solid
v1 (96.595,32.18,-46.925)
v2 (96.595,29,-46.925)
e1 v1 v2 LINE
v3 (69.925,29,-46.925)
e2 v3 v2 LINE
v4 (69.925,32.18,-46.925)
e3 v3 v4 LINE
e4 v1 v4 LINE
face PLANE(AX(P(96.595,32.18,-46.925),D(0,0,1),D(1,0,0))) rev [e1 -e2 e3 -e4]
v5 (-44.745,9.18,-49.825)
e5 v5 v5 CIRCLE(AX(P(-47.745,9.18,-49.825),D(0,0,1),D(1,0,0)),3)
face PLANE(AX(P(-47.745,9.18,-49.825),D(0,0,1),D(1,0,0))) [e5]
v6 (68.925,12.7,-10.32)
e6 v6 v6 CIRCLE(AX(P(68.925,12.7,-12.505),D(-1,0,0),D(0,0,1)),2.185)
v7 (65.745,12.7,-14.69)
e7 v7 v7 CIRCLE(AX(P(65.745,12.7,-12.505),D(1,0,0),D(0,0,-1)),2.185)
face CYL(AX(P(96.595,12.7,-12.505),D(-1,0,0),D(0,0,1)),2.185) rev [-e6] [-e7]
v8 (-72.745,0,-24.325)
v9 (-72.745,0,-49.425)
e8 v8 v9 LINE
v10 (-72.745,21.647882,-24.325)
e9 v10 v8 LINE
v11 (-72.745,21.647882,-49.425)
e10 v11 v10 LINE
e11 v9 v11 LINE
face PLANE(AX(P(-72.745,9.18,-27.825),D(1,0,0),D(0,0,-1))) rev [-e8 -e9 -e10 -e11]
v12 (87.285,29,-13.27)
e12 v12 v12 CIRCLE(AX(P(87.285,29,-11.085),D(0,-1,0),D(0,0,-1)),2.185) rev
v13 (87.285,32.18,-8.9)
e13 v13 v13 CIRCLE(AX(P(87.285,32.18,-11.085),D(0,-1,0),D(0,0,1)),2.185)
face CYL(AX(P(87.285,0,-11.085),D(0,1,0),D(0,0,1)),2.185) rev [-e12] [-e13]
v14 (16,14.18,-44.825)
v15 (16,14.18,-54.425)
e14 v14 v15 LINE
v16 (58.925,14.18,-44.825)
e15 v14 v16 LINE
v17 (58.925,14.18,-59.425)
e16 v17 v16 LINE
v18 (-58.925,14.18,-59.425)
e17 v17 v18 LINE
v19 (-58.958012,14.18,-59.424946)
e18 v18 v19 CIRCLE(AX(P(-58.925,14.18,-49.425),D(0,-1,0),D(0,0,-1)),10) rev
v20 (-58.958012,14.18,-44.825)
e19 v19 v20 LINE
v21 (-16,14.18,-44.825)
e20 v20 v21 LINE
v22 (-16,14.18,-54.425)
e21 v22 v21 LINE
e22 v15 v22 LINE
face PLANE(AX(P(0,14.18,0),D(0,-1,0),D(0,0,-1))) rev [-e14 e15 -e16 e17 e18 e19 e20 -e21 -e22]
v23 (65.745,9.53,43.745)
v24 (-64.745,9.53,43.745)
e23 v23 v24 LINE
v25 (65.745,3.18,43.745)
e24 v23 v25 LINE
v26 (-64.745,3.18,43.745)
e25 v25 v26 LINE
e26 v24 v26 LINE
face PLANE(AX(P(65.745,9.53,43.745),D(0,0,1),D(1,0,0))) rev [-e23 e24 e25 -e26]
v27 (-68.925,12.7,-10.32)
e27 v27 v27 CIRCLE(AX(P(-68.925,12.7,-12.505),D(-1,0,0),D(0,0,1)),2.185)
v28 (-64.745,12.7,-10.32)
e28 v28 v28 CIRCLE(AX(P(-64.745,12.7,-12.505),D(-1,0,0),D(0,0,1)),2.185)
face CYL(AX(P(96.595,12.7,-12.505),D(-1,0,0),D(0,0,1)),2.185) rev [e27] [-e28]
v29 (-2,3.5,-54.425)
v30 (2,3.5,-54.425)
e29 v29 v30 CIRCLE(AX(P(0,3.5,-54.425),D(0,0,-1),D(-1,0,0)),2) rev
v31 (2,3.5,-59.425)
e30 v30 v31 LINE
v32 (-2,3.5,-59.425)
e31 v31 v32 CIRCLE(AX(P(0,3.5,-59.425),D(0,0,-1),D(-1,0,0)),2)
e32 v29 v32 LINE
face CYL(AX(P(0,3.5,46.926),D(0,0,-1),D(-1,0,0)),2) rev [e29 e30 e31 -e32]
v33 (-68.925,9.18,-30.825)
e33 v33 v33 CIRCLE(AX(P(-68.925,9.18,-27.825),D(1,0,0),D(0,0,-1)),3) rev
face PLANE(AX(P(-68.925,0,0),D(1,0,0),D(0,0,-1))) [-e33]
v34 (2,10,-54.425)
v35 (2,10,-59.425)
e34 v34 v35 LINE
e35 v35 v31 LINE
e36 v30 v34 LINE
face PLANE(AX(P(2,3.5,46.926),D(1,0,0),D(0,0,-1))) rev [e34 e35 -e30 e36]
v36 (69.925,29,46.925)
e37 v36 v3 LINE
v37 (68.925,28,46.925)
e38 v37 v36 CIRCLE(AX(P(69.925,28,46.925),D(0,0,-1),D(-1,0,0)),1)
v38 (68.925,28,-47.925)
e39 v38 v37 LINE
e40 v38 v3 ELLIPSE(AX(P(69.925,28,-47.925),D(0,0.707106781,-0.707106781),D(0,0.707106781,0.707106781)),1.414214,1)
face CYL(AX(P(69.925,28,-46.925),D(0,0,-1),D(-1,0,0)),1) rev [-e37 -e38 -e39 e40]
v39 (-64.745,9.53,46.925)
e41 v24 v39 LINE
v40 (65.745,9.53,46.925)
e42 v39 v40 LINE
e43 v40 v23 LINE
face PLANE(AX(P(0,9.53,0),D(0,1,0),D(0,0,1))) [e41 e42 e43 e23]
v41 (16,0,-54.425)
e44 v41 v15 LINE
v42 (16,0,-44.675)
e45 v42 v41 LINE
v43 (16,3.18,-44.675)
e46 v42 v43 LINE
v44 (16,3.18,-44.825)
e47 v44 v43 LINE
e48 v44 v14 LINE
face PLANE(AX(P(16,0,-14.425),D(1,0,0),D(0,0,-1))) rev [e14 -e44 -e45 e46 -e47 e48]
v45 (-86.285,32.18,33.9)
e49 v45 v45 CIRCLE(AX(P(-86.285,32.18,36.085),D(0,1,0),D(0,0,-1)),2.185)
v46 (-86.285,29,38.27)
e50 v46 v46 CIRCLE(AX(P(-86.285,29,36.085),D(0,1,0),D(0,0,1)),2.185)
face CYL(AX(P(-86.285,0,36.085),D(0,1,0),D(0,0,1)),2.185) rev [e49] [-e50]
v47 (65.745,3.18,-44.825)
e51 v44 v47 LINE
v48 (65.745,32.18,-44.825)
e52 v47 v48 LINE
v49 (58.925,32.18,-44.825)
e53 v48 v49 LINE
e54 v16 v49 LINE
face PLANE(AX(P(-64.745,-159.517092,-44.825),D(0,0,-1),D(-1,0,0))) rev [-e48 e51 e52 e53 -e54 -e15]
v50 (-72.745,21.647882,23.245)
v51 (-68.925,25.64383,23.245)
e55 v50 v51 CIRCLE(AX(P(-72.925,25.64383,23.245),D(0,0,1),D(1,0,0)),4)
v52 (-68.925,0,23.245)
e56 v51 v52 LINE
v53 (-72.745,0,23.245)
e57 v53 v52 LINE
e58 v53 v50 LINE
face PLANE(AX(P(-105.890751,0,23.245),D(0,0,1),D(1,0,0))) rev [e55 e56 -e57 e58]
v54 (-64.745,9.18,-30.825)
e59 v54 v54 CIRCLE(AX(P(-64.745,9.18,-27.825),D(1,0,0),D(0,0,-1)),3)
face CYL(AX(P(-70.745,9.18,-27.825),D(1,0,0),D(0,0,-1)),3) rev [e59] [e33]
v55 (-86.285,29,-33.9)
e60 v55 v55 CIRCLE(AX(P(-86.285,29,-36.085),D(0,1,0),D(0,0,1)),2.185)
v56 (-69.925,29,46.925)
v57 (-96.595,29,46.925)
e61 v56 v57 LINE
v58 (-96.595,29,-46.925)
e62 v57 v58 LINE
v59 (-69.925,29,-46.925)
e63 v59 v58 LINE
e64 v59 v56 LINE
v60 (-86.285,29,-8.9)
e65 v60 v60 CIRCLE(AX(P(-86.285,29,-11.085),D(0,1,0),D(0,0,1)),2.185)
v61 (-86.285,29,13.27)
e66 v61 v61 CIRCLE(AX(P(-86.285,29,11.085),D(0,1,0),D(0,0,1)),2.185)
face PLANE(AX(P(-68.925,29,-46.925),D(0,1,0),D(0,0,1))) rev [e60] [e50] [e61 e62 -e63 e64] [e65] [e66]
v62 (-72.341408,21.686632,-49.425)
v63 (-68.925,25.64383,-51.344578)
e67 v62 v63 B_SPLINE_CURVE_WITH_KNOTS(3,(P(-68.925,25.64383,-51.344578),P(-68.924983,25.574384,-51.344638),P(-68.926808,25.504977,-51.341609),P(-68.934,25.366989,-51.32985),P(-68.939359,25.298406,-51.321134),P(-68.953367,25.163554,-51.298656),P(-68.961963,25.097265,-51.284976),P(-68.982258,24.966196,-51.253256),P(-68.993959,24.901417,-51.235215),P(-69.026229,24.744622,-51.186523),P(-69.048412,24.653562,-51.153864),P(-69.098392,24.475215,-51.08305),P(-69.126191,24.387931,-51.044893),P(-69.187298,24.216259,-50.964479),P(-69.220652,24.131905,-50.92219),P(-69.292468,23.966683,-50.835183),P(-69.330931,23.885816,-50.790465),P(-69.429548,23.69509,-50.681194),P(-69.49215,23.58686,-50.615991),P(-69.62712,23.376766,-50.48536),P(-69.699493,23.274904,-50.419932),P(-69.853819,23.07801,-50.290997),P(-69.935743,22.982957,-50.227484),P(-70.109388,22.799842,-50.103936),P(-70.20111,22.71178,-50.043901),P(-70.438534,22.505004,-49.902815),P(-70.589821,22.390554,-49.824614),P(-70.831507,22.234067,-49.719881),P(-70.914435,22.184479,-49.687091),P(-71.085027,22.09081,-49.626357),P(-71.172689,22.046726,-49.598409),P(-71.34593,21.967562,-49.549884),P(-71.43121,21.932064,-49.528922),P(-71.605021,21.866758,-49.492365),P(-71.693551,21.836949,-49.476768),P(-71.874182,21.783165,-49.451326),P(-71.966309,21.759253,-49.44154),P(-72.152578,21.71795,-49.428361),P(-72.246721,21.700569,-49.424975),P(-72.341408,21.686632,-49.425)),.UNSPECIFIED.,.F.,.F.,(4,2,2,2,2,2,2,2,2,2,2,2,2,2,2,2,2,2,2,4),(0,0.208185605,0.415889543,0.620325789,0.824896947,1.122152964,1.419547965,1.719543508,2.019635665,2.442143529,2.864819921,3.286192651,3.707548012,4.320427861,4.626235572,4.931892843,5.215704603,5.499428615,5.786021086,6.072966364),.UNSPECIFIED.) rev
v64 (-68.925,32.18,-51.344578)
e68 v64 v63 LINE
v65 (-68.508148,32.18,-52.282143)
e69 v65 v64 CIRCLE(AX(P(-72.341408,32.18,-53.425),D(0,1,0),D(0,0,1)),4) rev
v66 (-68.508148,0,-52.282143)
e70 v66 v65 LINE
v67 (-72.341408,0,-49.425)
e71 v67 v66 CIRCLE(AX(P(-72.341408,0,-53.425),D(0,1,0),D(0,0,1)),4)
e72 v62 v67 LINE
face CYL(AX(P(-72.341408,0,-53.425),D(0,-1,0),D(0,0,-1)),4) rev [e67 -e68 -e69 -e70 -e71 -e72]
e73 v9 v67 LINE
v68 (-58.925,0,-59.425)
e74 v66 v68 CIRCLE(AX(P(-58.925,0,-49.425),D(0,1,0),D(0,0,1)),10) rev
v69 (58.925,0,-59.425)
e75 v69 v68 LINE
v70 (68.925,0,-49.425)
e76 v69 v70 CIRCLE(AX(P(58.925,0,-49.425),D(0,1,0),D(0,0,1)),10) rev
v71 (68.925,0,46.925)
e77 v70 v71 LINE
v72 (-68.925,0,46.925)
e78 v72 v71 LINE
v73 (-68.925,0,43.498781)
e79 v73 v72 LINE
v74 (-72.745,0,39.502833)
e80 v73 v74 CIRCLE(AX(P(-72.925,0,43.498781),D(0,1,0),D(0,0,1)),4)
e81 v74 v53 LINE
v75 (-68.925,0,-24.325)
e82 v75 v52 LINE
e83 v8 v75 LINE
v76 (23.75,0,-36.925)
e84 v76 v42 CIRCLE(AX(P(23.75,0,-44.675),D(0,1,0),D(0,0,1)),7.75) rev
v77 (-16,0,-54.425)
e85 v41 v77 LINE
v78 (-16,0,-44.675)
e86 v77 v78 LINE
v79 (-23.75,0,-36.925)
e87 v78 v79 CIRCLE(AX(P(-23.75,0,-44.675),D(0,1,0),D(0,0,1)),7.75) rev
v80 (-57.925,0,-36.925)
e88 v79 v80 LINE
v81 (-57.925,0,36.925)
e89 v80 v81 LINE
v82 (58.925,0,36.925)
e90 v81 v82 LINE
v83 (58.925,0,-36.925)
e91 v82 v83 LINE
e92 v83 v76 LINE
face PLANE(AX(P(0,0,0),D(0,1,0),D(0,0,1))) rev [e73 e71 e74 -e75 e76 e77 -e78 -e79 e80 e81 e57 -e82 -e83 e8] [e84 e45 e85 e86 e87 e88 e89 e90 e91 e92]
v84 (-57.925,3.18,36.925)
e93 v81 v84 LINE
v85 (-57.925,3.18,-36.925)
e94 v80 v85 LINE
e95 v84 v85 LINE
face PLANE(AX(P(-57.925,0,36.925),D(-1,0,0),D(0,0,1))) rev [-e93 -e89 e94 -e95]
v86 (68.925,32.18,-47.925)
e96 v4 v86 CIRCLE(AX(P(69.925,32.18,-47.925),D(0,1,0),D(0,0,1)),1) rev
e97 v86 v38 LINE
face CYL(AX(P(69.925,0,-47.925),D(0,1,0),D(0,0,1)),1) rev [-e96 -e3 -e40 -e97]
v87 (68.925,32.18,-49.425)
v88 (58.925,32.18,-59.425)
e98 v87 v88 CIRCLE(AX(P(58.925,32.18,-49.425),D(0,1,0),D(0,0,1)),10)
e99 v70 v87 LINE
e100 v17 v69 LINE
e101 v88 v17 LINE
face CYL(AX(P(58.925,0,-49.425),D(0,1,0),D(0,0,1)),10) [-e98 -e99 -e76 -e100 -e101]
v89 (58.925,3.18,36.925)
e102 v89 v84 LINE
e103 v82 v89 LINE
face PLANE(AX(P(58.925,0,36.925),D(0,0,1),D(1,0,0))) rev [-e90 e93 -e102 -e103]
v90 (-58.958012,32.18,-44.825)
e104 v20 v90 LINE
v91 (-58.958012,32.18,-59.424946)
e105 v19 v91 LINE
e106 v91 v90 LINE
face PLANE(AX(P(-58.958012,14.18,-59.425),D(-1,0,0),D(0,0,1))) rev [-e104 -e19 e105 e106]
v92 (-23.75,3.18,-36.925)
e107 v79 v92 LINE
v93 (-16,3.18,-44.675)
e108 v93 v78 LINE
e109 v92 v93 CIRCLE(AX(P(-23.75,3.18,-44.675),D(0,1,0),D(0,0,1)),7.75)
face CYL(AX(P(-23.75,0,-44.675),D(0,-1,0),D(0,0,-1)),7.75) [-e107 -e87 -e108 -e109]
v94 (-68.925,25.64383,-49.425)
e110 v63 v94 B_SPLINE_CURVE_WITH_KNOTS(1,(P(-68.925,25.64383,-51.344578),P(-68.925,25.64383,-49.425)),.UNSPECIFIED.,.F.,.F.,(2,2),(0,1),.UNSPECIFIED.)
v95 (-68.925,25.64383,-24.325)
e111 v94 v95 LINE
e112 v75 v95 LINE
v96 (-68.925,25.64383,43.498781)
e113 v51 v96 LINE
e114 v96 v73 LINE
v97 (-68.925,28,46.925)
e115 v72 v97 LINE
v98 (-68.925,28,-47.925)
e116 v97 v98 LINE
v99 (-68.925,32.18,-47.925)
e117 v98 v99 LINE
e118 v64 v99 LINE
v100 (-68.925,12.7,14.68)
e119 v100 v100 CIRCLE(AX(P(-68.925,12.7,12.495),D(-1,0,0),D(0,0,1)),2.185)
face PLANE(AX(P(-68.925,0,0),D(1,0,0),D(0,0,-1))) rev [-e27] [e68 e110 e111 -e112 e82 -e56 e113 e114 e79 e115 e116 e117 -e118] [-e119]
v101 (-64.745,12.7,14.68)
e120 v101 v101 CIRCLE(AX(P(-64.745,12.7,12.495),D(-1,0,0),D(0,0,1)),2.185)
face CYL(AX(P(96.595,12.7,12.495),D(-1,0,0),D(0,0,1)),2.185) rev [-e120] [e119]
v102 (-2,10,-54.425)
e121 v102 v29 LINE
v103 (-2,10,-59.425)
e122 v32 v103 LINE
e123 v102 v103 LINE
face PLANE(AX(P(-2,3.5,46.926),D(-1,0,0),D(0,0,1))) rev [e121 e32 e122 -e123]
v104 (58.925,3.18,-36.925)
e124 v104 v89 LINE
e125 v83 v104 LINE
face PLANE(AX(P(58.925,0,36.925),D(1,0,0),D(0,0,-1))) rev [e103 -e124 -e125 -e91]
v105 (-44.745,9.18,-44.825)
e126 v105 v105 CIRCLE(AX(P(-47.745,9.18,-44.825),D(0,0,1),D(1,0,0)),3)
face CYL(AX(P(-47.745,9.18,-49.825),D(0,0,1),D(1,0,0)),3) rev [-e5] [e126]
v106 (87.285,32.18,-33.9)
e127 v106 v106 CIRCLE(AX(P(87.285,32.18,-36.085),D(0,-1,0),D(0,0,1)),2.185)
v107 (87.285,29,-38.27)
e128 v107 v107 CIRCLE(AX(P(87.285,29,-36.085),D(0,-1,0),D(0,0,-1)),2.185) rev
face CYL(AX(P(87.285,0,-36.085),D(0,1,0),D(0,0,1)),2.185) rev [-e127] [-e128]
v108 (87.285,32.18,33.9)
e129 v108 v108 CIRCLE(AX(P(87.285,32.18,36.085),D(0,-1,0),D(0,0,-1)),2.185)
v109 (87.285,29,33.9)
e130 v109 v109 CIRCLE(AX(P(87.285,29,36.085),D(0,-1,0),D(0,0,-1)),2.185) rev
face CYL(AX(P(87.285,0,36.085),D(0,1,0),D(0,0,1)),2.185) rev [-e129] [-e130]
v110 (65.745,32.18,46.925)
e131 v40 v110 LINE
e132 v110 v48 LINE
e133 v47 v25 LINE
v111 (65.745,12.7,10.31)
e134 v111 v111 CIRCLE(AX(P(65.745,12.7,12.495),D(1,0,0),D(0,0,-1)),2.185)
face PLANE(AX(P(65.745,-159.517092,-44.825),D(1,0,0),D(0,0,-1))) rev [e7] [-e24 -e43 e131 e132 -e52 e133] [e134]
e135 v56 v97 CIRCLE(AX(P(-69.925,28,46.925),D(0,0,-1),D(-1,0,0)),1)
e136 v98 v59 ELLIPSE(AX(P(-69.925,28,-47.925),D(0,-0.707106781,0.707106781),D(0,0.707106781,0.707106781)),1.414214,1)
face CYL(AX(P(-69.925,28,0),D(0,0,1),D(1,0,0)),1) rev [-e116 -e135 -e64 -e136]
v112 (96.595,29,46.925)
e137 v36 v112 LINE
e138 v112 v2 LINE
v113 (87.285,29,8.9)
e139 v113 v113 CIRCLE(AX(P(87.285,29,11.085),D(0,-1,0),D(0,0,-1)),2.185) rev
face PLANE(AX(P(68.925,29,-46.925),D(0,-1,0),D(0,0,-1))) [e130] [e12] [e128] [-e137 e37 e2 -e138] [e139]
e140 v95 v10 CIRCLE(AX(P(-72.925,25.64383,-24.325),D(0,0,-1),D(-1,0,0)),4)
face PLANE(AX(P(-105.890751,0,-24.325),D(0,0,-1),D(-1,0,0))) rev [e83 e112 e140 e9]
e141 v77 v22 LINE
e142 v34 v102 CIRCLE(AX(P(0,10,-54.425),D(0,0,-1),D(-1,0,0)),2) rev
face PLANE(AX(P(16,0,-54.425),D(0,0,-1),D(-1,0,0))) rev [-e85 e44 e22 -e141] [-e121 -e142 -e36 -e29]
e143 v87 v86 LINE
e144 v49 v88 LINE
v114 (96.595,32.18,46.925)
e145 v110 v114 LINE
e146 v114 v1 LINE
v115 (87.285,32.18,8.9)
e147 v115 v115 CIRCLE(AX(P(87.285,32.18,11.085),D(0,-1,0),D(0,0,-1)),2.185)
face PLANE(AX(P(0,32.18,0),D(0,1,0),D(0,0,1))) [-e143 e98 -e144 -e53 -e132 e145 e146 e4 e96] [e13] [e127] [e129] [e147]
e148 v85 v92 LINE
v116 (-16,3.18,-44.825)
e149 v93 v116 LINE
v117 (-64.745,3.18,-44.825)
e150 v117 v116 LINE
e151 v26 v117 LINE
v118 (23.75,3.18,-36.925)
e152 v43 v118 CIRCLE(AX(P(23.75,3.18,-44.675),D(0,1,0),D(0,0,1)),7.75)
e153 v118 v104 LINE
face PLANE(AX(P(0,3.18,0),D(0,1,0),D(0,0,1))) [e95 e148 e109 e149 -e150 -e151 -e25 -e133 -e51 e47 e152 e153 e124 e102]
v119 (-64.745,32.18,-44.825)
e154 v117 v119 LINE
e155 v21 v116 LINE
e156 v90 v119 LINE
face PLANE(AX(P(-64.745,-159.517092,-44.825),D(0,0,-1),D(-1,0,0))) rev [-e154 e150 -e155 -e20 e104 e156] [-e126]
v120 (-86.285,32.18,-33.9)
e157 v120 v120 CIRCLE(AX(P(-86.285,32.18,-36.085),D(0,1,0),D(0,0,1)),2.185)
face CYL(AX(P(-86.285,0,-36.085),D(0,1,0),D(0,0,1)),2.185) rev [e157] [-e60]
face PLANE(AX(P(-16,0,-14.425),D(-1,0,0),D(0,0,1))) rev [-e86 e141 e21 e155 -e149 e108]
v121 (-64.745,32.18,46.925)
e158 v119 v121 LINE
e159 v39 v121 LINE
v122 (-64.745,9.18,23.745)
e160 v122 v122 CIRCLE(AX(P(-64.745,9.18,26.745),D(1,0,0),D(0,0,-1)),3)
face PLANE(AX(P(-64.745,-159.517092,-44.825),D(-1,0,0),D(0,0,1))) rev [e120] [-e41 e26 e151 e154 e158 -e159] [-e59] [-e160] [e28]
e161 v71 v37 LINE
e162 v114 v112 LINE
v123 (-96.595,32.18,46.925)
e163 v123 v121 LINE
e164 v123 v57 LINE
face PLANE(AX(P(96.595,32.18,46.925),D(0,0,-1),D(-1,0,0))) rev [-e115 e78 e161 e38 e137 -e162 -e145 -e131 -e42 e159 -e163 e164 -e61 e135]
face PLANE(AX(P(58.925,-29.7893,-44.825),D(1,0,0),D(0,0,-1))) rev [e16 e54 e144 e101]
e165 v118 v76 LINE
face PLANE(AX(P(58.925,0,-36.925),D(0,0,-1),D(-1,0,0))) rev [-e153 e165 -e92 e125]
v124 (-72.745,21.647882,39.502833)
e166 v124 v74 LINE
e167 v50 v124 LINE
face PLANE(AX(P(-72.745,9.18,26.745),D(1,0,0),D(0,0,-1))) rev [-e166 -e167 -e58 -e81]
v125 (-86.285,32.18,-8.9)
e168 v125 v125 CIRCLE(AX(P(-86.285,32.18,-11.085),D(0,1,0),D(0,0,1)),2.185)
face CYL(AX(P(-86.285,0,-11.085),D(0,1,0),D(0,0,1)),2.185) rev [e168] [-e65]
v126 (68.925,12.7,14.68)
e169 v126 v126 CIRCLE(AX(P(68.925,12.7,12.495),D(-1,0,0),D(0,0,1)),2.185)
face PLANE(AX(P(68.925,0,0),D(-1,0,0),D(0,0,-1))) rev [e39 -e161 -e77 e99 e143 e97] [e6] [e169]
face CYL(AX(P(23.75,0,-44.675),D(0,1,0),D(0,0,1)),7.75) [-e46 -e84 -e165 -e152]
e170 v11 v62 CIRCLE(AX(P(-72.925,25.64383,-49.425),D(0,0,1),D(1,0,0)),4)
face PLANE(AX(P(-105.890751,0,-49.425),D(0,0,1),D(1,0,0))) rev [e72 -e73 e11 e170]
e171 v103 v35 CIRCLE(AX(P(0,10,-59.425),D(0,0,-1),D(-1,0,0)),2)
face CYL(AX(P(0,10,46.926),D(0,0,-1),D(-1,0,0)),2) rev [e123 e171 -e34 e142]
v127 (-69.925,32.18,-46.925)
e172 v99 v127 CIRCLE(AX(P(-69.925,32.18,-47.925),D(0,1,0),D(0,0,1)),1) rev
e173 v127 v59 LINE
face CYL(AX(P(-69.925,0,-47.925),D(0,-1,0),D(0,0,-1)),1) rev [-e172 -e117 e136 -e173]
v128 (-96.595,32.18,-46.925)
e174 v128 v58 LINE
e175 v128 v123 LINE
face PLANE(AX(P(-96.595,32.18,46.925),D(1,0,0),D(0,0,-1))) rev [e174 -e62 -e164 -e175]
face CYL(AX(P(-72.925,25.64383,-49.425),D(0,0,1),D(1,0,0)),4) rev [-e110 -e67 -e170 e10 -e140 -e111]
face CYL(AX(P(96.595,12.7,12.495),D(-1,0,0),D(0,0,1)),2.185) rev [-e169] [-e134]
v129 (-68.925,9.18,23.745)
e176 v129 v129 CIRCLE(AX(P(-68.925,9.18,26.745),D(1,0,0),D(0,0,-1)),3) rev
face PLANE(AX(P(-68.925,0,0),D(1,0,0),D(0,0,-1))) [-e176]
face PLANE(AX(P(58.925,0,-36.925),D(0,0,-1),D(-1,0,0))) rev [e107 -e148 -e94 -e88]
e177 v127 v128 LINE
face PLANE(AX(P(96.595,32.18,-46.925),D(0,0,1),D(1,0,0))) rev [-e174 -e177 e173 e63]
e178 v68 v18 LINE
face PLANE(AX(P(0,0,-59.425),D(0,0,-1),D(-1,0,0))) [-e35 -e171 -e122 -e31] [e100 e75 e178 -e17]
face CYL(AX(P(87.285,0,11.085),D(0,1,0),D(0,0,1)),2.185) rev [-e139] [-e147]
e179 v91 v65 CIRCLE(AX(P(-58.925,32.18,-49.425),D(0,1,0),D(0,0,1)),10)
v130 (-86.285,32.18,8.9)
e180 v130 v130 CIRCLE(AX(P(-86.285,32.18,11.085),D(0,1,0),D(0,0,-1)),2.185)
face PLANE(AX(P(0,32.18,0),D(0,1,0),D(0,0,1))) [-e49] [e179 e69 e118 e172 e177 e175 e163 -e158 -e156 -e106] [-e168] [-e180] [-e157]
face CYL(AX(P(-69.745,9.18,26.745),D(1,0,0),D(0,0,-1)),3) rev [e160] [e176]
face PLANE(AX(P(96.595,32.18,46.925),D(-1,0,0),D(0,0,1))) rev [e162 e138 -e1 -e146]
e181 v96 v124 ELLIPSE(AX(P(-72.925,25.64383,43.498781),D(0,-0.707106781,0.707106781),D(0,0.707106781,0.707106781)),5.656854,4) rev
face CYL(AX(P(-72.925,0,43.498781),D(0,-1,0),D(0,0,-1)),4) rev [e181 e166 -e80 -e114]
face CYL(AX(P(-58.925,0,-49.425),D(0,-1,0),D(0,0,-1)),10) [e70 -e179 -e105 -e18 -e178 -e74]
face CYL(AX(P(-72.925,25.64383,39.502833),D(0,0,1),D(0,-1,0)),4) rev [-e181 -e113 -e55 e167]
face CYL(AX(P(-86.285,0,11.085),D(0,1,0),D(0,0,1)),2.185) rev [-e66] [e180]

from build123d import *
from OCP.BRepAlgoAPI import BRepAlgoAPI_Cut
from OCP.TopTools import TopTools_ListOfShape

# Parameters (mm, degrees)
SKETCH1_W               = 193.19
SKETCH1_H               = 93.85
BOSS_EXTRUDE1_DEPTH     = 32.179999902
SKETCH3_W               = 93.85
SKETCH3_H               = 28.999999912
CUT_EXTRUDE1_DEPTH      = 27.67
SKETCH5_W               = 137.85
SKETCH5_H               = 32.179999902
BOSS_EXTRUDE2_DEPTH     = 12.5
SKETCH6_W               = 32
SKETCH6_H               = 40
CUT_EXTRUDE2_DEPTH      = 118.887561022
SKETCH21_W              = 116.85
SKETCH21_H              = 73.85
CUT_EXTRUDE3_DEPTH      = 118.887561022
CUT_EXTRUDE5_DEPTH      = 118.887561022
CUT_EXTRUDE5_DEPTH_BACK = 29
SKETCH22_W              = 130.49
SKETCH22_H              = 91.75
SKETCH23_W              = 130.49
SKETCH23_H              = 3.18
BOSS_EXTRUDE4_DEPTH     = 6.35
SKETCH25_R              = 2.185
CUT_EXTRUDE6_DEPTH      = 118.887561022
SKETCH26_R              = 2.185
CUT_EXTRUDE8_DEPTH      = 179.78409722
FILLET3_R               = 1
FILLET1_R               = 7.75
FILLET2_R               = 10
CUT_EXTRUDE9_REACH      = 149.229
SKETCH47_R              = 3.5
BOSS_EXTRUDE5_DEPTH     = 8
SKETCH48_R              = 3
CUT_EXTRUDE18_DEPTH     = 6
SKETCH49_R              = 3
CUT_EXTRUDE19_DEPTH     = 5
SKETCH51_R              = 3.5
BOSS_EXTRUDE6_DEPTH     = 8
SKETCH52_R              = 3
CUT_EXTRUDE21_DEPTH     = 5
SKETCH53_W              = 25.1
SKETCH53_H              = 21.647882291
SKETCH53_W_2            = 16.257833485
BOSS_EXTRUDE7_DEPTH     = 3.82
FILLET4_DEPTH           = 21.647882291
FILLET4_START           = -51.344578607
FILLET4_2_DEPTH         = 27.019578607
FILLET4_START_2         = 23.245
FILLET4_3_DEPTH         = 20.253781432
FILLET4_START_3         = 21.647882291
FILLET4_4_DEPTH         = 3.995947947
FILLET4_5_DEPTH         = 10.532117611
SKETCH54_W              = 36.508182433
SKETCH54_H              = 14.6
CUT_EXTRUDE24_DEPTH     = 22.649999902
SKETCH55_W              = 81.374829932
SKETCH55_H              = 14.6
CUT_EXTRUDE26_DEPTH     = 18
SKETCH57_W              = 36.508182433
SKETCH57_H              = 14.6
BOSS_EXTRUDE8_DEPTH     = 4.649999902


with BuildPart() as part:
    # Sketch1 → Boss-Extrude1 (new body)
    with BuildSketch(Plane(origin=(0, 0, 0), x_dir=(1, 0, 0), z_dir=(0, 1, 0))):
        Rectangle(SKETCH1_W, SKETCH1_H)
    extrude(amount=BOSS_EXTRUDE1_DEPTH)

    # Sketch3 → Cut-Extrude1 (cut)
    with BuildSketch(Plane.ZY.offset(96.595)):
        with Locations((0, 14.499999956)):
            Rectangle(SKETCH3_W, SKETCH3_H)
    cut_extrude1 = extrude(amount=-CUT_EXTRUDE1_DEPTH, mode=Mode.SUBTRACT)

    # Mirror1: Cut-Extrude1 across plane
    add(cut_extrude1.mirror(Plane(origin=(0, 0, 0), x_dir=(0, 0, 1), z_dir=(1, 0, 0))), mode=Mode.SUBTRACT)

    # Sketch5 → Boss-Extrude2 (add)
    with BuildSketch(Plane(origin=(0, 0, -46.925), x_dir=(-1, 0, 0), z_dir=(0, 0, -1))):
        with Locations((0, 16.089999951)):
            Rectangle(SKETCH5_W, SKETCH5_H)
    extrude(amount=BOSS_EXTRUDE2_DEPTH)

    # Sketch6 → Cut-Extrude2 (cut, through all)
    with BuildSketch(Plane(origin=(0, 32.179999902, 0), x_dir=(1, 0, 0), z_dir=(0, 1, 0))):
        with Locations((0, 34.425)):
            Rectangle(SKETCH6_W, SKETCH6_H)
    extrude(amount=-CUT_EXTRUDE2_DEPTH, mode=Mode.SUBTRACT)

    # Sketch21 → Cut-Extrude3 (cut, through all)
    with BuildSketch(Plane(origin=(0, 32.179999902, 0), x_dir=(1, 0, 0), z_dir=(0, 1, 0))):
        with Locations((0.5, 0)):
            Rectangle(SKETCH21_W, SKETCH21_H)
    extrude(amount=-CUT_EXTRUDE3_DEPTH, mode=Mode.SUBTRACT)

    # Sketch22 → Cut-Extrude5 (cut, two sides: drawn at the far end of the back side and taken through both)
    with BuildSketch(Plane(origin=(0, 32.179999902, 0), x_dir=(1, 0, 0), z_dir=(0, 1, 0)).offset(-CUT_EXTRUDE5_DEPTH_BACK)):
        with Locations((0.5, -1.05)):
            Rectangle(SKETCH22_W, SKETCH22_H)
    extrude(amount=CUT_EXTRUDE5_DEPTH + CUT_EXTRUDE5_DEPTH_BACK, mode=Mode.SUBTRACT)

    # Sketch23 → Boss-Extrude4 (add)
    with BuildSketch(Plane(origin=(0, 3.18, 0), x_dir=(1, 0, 0), z_dir=(0, 1, 0))):
        with Locations((0.5, -45.335)):
            Rectangle(SKETCH23_W, SKETCH23_H)
    extrude(amount=BOSS_EXTRUDE4_DEPTH)

    # Sketch25 → Cut-Extrude6 (cut, through all)
    with BuildSketch(Plane(origin=(0, 32.179999902, 0), x_dir=(1, 0, 0), z_dir=(0, 1, 0))):
        with Locations(Location((-86.285, 36.085, 0), (0, 0, 270))):
            Circle(SKETCH25_R)
        with Locations(Location((-86.285, 11.085, 0), (0, 0, 270))):
            Circle(SKETCH25_R)
        with Locations(Location((-86.285, -11.085, 0), (0, 0, 270))):
            Circle(SKETCH25_R)
        with Locations(Location((-86.285, -36.085, 0), (0, 0, 270))):
            Circle(SKETCH25_R)
    cut_extrude6 = extrude(amount=-CUT_EXTRUDE6_DEPTH, mode=Mode.SUBTRACT)

    # Sketch26 → Cut-Extrude8 (cut, through all)
    with BuildSketch(Plane.ZY.offset(68.925)):
        with Locations((-12.505, 12.7)):
            Circle(SKETCH26_R)
        with Locations((12.495, 12.7)):
            Circle(SKETCH26_R)
    extrude(amount=-CUT_EXTRUDE8_DEPTH, mode=Mode.SUBTRACT)

    # Mirror4: Cut-Extrude6 across plane
    add(cut_extrude6.mirror(Plane(origin=(0.5, 0, 0), x_dir=(0, 0, 1), z_dir=(1, 0, 0))), mode=Mode.SUBTRACT)

    # Fillet3
    fillet3_edges = [part.edges().sort_by_distance(p)[0] for p in [
        (-68.925, 28.999999912, 0),
        (68.925, 28.999999912, 0),
        (-68.925, 30.589999907, -46.925),
        (68.925, 30.589999907, -46.925),
    ]]
    fillet(fillet3_edges, radius=FILLET3_R)

    # Fillet1
    fillet1_edges = [part.edges().sort_by_distance(p)[0] for p in [
        (-16, 1.589999951, -36.925),
        (16, 1.589999951, -36.925),
    ]]
    fillet(fillet1_edges, radius=FILLET1_R)

    # Fillet2
    fillet2_edges = [part.edges().sort_by_distance(p)[0] for p in [
        (68.925, 16.089999951, -59.425),
        (-68.925, 16.089999951, -59.425),
    ]]
    fillet(fillet2_edges, radius=FILLET2_R)

    # Sketch27 → Cut-Extrude9 (cut, up to next)
    with BuildSketch(Plane(origin=(0, 0, -59.425), x_dir=(-1, 0, 0), z_dir=(0, 0, -1)), mode=Mode.PRIVATE) as cut_extrude9_sk1:
        with BuildLine():
            Line((-2, 3.5), (-2, 10))
            ThreePointArc((-2, 10), (0, 12), (2, 10))
            Line((2, 10), (2, 3.5))
            ThreePointArc((2, 3.5), (0, 1.5), (-2, 3.5))
        make_face()
    cut_extrude9_tool1 = extrude(cut_extrude9_sk1.sketch, amount=-CUT_EXTRUDE9_REACH, mode=Mode.PRIVATE) & part.part
    add(cut_extrude9_tool1.solids().sort_by_distance((0, 6.75, -59.425))[0], mode=Mode.SUBTRACT)

    # Sketch47 → Boss-Extrude5 (add)
    with BuildSketch(Plane(origin=(-64.745, 0, 0), x_dir=(0, 0, -1), z_dir=(1, 0, 0))):
        with Locations((27.825, 9.18)):
            Circle(SKETCH47_R)
    extrude(amount=-BOSS_EXTRUDE5_DEPTH)

    # Sketch48 → Cut-Extrude18 (cut)
    with BuildSketch(Plane(origin=(-64.745, 0, 0), x_dir=(0, 0, -1), z_dir=(1, 0, 0))):
        with Locations((27.825, 9.18)):
            Circle(SKETCH48_R)
    extrude(amount=-CUT_EXTRUDE18_DEPTH, mode=Mode.SUBTRACT)

    # Sketch49 → Cut-Extrude19 (cut)
    with BuildSketch(Plane.XY.offset(-44.825)):
        with Locations((-47.745, 9.18)):
            Circle(SKETCH49_R)
    extrude(amount=-CUT_EXTRUDE19_DEPTH, mode=Mode.SUBTRACT)

    # Sketch51 → Boss-Extrude6 (add)
    with BuildSketch(Plane(origin=(-64.745, 0, 0), x_dir=(0, 0, -1), z_dir=(1, 0, 0))):
        with Locations((-26.745, 9.18)):
            Circle(SKETCH51_R)
    extrude(amount=-BOSS_EXTRUDE6_DEPTH)

    # Sketch52 → Cut-Extrude21 (cut)
    with BuildSketch(Plane(origin=(-64.745, 0, 0), x_dir=(0, 0, -1), z_dir=(1, 0, 0))):
        with Locations((-26.745, 9.18)):
            Circle(SKETCH52_R)
    extrude(amount=-CUT_EXTRUDE21_DEPTH, mode=Mode.SUBTRACT)

    # Sketch53 → Boss-Extrude7 (add)
    with BuildSketch(Plane.ZY.offset(68.925)):
        with Locations((-36.875, 10.823941146)):
            Rectangle(SKETCH53_W, SKETCH53_H)
        with Locations((31.373916743, 10.823941146)):
            Rectangle(SKETCH53_W_2, SKETCH53_H)
    extrude(amount=BOSS_EXTRUDE7_DEPTH)


with BuildPart() as fillet4_tool:
    # Fillet4: read off the stored shape, not the designer's step
    # Fillet4 outline → Fillet4 (new body)
    with BuildSketch(Plane(origin=(0, 0, 0), x_dir=(1, 0, 0), z_dir=(0, 1, 0))):
        with BuildLine():
            Line((-68.925, -39.502833485), (-72.745, -39.502833485))
            ThreePointArc((-72.745, -39.502833485), (-70.033633541, -40.73472644), (-68.925, -43.498781432))
            Line((-68.925, -43.498781432), (-68.925, -39.502833485))
        make_face()
        with BuildLine():
            Line((-72.341407865, 49.425), (-68.925, 49.425))
            ThreePointArc((-68.925, 49.425), (-68.820238369, 50.868695821), (-68.508148475, 52.282142857))
            ThreePointArc((-68.508148475, 52.282142857), (-69.950950646, 50.217865097), (-72.341407865, 49.425))
        make_face()
    extrude(amount=FILLET4_DEPTH)


with BuildPart() as part_1:
    add(part.part)


with BuildPart() as part_2:
    # Fillet4: joined with fillet4_tool
    add(part_1.part.fuse(fillet4_tool.part, tol=0.00001))


with BuildPart() as fillet4_2_tool:
    # Fillet4 2 outline → Fillet4 2 (new body)
    with BuildSketch(Plane.XY.offset(FILLET4_START)):
        with BuildLine():
            ThreePointArc((-68.925, 25.643830238), (-70.033633541, 22.879775246), (-72.745, 21.647882291))
            Line((-72.745, 21.647882291), (-68.925, 21.647882291))
            Line((-68.925, 21.647882291), (-68.925, 25.643830238))
        make_face()
    extrude(amount=FILLET4_2_DEPTH)


with BuildPart() as part_3:
    add(part_2.part)


with BuildPart() as part_4:
    # Fillet4 2: joined with fillet4_2_tool
    add(part_3.part.fuse(fillet4_2_tool.part, tol=0.00001))


with BuildPart() as fillet4_3_tool:
    # Fillet4 3 outline → Fillet4 3 (new body)
    with BuildSketch(Plane.XY.offset(FILLET4_START_2)):
        with BuildLine():
            ThreePointArc((-68.925, 25.643830238), (-70.033633541, 22.879775246), (-72.745, 21.647882291))
            Line((-72.745, 21.647882291), (-68.925, 21.647882291))
            Line((-68.925, 21.647882291), (-68.925, 25.643830238))
        make_face()
    extrude(amount=FILLET4_3_DEPTH)


with BuildPart() as part_5:
    add(part_4.part)


with BuildPart() as part_6:
    # Fillet4 3: joined with fillet4_3_tool
    add(part_5.part.fuse(fillet4_3_tool.part, tol=0.00001))


with BuildPart() as fillet4_4_tool:
    # Fillet4 4 outline → Fillet4 4 (new body)
    with BuildSketch(Plane(origin=(0, 0, 0), x_dir=(1, 0, 0), z_dir=(0, 1, 0)).offset(FILLET4_START_3)):
        with BuildLine():
            ThreePointArc((-68.925, -43.498781432), (-70.033633541, -40.73472644), (-72.745, -39.502833485))
            Line((-72.745, -39.502833485), (-72.745, -43.498781432))
            Line((-72.745, -43.498781432), (-68.925, -43.498781432))
        make_face()
        with BuildLine():
            Line((-68.925, 51.344577615), (-72.745, 51.344578607))
            Line((-72.745, 51.344578607), (-72.745, 49.425))
            Line((-72.745, 49.425), (-72.341407865, 49.425))
            ThreePointArc((-72.341407865, 49.425), (-70.38203163, 49.93775972), (-68.925, 51.344577615))
        make_face()
    extrude(amount=FILLET4_4_DEPTH)


with BuildPart() as part_7:
    add(part_6.part)

    # Fillet4 4: cut by fillet4_4_tool, with a tolerance
    fillet4_4_stock = TopTools_ListOfShape()
    fillet4_4_stock.Append(part_7.part.wrapped)
    fillet4_4_tools = TopTools_ListOfShape()
    fillet4_4_tools.Append(fillet4_4_tool.part.wrapped)
    fillet4_4_cut = BRepAlgoAPI_Cut()
    fillet4_4_cut.SetArguments(fillet4_4_stock)
    fillet4_4_cut.SetTools(fillet4_4_tools)
    fillet4_4_cut.SetFuzzyValue(0.00001)
    fillet4_4_cut.Build()
    add(Compound.cast(fillet4_4_cut.Shape()).solids(), mode=Mode.REPLACE)


with BuildPart() as fillet4_5_tool:
    # Fillet4 5 outline → Fillet4 5 (new body)
    with BuildSketch(Plane(origin=(0, 0, 0), x_dir=(1, 0, 0), z_dir=(0, 1, 0)).offset(FILLET4_START_3)):
        with BuildLine():
            ThreePointArc((-68.508148475, 52.282142857), (-68.686387212, 51.799938762), (-68.925, 51.344577615))
            Line((-68.925, 51.344577615), (-68.925, 49.425))
            ThreePointArc((-68.925, 49.425), (-68.820238369, 50.868695821), (-68.508148475, 52.282142857))
        make_face()
    extrude(amount=FILLET4_5_DEPTH)


with BuildPart() as part_8:
    add(part_7.part)


with BuildPart() as part_9:
    # Fillet4 5: joined with fillet4_5_tool
    add(part_8.part.fuse(fillet4_5_tool.part, tol=0.00001))

    # Sketch54 → Cut-Extrude24 (cut)
    with BuildSketch(Plane(origin=(0, 32.179999902, 0), x_dir=(1, 0, 0), z_dir=(0, 1, 0))):
        with Locations((40.670908784, 52.125)):
            Rectangle(SKETCH54_W, SKETCH54_H)
    extrude(amount=-CUT_EXTRUDE24_DEPTH, mode=Mode.SUBTRACT)

    # Sketch55 → Cut-Extrude26 (cut)
    with BuildSketch(Plane(origin=(0, 32.179999902, 0), x_dir=(1, 0, 0), z_dir=(0, 1, 0))):
        with Locations((-18.270597399, 52.125)):
            Rectangle(SKETCH55_W, SKETCH55_H)
    extrude(amount=-CUT_EXTRUDE26_DEPTH, mode=Mode.SUBTRACT)

    # Sketch57 → Boss-Extrude8 (add)
    with BuildSketch(Plane(origin=(0, 9.53, 0), x_dir=(1, 0, 0), z_dir=(0, 1, 0))):
        with Locations((40.670908784, 52.125)):
            Rectangle(SKETCH57_W, SKETCH57_H)
    extrude(amount=BOSS_EXTRUDE8_DEPTH)


solid = part_9.part
